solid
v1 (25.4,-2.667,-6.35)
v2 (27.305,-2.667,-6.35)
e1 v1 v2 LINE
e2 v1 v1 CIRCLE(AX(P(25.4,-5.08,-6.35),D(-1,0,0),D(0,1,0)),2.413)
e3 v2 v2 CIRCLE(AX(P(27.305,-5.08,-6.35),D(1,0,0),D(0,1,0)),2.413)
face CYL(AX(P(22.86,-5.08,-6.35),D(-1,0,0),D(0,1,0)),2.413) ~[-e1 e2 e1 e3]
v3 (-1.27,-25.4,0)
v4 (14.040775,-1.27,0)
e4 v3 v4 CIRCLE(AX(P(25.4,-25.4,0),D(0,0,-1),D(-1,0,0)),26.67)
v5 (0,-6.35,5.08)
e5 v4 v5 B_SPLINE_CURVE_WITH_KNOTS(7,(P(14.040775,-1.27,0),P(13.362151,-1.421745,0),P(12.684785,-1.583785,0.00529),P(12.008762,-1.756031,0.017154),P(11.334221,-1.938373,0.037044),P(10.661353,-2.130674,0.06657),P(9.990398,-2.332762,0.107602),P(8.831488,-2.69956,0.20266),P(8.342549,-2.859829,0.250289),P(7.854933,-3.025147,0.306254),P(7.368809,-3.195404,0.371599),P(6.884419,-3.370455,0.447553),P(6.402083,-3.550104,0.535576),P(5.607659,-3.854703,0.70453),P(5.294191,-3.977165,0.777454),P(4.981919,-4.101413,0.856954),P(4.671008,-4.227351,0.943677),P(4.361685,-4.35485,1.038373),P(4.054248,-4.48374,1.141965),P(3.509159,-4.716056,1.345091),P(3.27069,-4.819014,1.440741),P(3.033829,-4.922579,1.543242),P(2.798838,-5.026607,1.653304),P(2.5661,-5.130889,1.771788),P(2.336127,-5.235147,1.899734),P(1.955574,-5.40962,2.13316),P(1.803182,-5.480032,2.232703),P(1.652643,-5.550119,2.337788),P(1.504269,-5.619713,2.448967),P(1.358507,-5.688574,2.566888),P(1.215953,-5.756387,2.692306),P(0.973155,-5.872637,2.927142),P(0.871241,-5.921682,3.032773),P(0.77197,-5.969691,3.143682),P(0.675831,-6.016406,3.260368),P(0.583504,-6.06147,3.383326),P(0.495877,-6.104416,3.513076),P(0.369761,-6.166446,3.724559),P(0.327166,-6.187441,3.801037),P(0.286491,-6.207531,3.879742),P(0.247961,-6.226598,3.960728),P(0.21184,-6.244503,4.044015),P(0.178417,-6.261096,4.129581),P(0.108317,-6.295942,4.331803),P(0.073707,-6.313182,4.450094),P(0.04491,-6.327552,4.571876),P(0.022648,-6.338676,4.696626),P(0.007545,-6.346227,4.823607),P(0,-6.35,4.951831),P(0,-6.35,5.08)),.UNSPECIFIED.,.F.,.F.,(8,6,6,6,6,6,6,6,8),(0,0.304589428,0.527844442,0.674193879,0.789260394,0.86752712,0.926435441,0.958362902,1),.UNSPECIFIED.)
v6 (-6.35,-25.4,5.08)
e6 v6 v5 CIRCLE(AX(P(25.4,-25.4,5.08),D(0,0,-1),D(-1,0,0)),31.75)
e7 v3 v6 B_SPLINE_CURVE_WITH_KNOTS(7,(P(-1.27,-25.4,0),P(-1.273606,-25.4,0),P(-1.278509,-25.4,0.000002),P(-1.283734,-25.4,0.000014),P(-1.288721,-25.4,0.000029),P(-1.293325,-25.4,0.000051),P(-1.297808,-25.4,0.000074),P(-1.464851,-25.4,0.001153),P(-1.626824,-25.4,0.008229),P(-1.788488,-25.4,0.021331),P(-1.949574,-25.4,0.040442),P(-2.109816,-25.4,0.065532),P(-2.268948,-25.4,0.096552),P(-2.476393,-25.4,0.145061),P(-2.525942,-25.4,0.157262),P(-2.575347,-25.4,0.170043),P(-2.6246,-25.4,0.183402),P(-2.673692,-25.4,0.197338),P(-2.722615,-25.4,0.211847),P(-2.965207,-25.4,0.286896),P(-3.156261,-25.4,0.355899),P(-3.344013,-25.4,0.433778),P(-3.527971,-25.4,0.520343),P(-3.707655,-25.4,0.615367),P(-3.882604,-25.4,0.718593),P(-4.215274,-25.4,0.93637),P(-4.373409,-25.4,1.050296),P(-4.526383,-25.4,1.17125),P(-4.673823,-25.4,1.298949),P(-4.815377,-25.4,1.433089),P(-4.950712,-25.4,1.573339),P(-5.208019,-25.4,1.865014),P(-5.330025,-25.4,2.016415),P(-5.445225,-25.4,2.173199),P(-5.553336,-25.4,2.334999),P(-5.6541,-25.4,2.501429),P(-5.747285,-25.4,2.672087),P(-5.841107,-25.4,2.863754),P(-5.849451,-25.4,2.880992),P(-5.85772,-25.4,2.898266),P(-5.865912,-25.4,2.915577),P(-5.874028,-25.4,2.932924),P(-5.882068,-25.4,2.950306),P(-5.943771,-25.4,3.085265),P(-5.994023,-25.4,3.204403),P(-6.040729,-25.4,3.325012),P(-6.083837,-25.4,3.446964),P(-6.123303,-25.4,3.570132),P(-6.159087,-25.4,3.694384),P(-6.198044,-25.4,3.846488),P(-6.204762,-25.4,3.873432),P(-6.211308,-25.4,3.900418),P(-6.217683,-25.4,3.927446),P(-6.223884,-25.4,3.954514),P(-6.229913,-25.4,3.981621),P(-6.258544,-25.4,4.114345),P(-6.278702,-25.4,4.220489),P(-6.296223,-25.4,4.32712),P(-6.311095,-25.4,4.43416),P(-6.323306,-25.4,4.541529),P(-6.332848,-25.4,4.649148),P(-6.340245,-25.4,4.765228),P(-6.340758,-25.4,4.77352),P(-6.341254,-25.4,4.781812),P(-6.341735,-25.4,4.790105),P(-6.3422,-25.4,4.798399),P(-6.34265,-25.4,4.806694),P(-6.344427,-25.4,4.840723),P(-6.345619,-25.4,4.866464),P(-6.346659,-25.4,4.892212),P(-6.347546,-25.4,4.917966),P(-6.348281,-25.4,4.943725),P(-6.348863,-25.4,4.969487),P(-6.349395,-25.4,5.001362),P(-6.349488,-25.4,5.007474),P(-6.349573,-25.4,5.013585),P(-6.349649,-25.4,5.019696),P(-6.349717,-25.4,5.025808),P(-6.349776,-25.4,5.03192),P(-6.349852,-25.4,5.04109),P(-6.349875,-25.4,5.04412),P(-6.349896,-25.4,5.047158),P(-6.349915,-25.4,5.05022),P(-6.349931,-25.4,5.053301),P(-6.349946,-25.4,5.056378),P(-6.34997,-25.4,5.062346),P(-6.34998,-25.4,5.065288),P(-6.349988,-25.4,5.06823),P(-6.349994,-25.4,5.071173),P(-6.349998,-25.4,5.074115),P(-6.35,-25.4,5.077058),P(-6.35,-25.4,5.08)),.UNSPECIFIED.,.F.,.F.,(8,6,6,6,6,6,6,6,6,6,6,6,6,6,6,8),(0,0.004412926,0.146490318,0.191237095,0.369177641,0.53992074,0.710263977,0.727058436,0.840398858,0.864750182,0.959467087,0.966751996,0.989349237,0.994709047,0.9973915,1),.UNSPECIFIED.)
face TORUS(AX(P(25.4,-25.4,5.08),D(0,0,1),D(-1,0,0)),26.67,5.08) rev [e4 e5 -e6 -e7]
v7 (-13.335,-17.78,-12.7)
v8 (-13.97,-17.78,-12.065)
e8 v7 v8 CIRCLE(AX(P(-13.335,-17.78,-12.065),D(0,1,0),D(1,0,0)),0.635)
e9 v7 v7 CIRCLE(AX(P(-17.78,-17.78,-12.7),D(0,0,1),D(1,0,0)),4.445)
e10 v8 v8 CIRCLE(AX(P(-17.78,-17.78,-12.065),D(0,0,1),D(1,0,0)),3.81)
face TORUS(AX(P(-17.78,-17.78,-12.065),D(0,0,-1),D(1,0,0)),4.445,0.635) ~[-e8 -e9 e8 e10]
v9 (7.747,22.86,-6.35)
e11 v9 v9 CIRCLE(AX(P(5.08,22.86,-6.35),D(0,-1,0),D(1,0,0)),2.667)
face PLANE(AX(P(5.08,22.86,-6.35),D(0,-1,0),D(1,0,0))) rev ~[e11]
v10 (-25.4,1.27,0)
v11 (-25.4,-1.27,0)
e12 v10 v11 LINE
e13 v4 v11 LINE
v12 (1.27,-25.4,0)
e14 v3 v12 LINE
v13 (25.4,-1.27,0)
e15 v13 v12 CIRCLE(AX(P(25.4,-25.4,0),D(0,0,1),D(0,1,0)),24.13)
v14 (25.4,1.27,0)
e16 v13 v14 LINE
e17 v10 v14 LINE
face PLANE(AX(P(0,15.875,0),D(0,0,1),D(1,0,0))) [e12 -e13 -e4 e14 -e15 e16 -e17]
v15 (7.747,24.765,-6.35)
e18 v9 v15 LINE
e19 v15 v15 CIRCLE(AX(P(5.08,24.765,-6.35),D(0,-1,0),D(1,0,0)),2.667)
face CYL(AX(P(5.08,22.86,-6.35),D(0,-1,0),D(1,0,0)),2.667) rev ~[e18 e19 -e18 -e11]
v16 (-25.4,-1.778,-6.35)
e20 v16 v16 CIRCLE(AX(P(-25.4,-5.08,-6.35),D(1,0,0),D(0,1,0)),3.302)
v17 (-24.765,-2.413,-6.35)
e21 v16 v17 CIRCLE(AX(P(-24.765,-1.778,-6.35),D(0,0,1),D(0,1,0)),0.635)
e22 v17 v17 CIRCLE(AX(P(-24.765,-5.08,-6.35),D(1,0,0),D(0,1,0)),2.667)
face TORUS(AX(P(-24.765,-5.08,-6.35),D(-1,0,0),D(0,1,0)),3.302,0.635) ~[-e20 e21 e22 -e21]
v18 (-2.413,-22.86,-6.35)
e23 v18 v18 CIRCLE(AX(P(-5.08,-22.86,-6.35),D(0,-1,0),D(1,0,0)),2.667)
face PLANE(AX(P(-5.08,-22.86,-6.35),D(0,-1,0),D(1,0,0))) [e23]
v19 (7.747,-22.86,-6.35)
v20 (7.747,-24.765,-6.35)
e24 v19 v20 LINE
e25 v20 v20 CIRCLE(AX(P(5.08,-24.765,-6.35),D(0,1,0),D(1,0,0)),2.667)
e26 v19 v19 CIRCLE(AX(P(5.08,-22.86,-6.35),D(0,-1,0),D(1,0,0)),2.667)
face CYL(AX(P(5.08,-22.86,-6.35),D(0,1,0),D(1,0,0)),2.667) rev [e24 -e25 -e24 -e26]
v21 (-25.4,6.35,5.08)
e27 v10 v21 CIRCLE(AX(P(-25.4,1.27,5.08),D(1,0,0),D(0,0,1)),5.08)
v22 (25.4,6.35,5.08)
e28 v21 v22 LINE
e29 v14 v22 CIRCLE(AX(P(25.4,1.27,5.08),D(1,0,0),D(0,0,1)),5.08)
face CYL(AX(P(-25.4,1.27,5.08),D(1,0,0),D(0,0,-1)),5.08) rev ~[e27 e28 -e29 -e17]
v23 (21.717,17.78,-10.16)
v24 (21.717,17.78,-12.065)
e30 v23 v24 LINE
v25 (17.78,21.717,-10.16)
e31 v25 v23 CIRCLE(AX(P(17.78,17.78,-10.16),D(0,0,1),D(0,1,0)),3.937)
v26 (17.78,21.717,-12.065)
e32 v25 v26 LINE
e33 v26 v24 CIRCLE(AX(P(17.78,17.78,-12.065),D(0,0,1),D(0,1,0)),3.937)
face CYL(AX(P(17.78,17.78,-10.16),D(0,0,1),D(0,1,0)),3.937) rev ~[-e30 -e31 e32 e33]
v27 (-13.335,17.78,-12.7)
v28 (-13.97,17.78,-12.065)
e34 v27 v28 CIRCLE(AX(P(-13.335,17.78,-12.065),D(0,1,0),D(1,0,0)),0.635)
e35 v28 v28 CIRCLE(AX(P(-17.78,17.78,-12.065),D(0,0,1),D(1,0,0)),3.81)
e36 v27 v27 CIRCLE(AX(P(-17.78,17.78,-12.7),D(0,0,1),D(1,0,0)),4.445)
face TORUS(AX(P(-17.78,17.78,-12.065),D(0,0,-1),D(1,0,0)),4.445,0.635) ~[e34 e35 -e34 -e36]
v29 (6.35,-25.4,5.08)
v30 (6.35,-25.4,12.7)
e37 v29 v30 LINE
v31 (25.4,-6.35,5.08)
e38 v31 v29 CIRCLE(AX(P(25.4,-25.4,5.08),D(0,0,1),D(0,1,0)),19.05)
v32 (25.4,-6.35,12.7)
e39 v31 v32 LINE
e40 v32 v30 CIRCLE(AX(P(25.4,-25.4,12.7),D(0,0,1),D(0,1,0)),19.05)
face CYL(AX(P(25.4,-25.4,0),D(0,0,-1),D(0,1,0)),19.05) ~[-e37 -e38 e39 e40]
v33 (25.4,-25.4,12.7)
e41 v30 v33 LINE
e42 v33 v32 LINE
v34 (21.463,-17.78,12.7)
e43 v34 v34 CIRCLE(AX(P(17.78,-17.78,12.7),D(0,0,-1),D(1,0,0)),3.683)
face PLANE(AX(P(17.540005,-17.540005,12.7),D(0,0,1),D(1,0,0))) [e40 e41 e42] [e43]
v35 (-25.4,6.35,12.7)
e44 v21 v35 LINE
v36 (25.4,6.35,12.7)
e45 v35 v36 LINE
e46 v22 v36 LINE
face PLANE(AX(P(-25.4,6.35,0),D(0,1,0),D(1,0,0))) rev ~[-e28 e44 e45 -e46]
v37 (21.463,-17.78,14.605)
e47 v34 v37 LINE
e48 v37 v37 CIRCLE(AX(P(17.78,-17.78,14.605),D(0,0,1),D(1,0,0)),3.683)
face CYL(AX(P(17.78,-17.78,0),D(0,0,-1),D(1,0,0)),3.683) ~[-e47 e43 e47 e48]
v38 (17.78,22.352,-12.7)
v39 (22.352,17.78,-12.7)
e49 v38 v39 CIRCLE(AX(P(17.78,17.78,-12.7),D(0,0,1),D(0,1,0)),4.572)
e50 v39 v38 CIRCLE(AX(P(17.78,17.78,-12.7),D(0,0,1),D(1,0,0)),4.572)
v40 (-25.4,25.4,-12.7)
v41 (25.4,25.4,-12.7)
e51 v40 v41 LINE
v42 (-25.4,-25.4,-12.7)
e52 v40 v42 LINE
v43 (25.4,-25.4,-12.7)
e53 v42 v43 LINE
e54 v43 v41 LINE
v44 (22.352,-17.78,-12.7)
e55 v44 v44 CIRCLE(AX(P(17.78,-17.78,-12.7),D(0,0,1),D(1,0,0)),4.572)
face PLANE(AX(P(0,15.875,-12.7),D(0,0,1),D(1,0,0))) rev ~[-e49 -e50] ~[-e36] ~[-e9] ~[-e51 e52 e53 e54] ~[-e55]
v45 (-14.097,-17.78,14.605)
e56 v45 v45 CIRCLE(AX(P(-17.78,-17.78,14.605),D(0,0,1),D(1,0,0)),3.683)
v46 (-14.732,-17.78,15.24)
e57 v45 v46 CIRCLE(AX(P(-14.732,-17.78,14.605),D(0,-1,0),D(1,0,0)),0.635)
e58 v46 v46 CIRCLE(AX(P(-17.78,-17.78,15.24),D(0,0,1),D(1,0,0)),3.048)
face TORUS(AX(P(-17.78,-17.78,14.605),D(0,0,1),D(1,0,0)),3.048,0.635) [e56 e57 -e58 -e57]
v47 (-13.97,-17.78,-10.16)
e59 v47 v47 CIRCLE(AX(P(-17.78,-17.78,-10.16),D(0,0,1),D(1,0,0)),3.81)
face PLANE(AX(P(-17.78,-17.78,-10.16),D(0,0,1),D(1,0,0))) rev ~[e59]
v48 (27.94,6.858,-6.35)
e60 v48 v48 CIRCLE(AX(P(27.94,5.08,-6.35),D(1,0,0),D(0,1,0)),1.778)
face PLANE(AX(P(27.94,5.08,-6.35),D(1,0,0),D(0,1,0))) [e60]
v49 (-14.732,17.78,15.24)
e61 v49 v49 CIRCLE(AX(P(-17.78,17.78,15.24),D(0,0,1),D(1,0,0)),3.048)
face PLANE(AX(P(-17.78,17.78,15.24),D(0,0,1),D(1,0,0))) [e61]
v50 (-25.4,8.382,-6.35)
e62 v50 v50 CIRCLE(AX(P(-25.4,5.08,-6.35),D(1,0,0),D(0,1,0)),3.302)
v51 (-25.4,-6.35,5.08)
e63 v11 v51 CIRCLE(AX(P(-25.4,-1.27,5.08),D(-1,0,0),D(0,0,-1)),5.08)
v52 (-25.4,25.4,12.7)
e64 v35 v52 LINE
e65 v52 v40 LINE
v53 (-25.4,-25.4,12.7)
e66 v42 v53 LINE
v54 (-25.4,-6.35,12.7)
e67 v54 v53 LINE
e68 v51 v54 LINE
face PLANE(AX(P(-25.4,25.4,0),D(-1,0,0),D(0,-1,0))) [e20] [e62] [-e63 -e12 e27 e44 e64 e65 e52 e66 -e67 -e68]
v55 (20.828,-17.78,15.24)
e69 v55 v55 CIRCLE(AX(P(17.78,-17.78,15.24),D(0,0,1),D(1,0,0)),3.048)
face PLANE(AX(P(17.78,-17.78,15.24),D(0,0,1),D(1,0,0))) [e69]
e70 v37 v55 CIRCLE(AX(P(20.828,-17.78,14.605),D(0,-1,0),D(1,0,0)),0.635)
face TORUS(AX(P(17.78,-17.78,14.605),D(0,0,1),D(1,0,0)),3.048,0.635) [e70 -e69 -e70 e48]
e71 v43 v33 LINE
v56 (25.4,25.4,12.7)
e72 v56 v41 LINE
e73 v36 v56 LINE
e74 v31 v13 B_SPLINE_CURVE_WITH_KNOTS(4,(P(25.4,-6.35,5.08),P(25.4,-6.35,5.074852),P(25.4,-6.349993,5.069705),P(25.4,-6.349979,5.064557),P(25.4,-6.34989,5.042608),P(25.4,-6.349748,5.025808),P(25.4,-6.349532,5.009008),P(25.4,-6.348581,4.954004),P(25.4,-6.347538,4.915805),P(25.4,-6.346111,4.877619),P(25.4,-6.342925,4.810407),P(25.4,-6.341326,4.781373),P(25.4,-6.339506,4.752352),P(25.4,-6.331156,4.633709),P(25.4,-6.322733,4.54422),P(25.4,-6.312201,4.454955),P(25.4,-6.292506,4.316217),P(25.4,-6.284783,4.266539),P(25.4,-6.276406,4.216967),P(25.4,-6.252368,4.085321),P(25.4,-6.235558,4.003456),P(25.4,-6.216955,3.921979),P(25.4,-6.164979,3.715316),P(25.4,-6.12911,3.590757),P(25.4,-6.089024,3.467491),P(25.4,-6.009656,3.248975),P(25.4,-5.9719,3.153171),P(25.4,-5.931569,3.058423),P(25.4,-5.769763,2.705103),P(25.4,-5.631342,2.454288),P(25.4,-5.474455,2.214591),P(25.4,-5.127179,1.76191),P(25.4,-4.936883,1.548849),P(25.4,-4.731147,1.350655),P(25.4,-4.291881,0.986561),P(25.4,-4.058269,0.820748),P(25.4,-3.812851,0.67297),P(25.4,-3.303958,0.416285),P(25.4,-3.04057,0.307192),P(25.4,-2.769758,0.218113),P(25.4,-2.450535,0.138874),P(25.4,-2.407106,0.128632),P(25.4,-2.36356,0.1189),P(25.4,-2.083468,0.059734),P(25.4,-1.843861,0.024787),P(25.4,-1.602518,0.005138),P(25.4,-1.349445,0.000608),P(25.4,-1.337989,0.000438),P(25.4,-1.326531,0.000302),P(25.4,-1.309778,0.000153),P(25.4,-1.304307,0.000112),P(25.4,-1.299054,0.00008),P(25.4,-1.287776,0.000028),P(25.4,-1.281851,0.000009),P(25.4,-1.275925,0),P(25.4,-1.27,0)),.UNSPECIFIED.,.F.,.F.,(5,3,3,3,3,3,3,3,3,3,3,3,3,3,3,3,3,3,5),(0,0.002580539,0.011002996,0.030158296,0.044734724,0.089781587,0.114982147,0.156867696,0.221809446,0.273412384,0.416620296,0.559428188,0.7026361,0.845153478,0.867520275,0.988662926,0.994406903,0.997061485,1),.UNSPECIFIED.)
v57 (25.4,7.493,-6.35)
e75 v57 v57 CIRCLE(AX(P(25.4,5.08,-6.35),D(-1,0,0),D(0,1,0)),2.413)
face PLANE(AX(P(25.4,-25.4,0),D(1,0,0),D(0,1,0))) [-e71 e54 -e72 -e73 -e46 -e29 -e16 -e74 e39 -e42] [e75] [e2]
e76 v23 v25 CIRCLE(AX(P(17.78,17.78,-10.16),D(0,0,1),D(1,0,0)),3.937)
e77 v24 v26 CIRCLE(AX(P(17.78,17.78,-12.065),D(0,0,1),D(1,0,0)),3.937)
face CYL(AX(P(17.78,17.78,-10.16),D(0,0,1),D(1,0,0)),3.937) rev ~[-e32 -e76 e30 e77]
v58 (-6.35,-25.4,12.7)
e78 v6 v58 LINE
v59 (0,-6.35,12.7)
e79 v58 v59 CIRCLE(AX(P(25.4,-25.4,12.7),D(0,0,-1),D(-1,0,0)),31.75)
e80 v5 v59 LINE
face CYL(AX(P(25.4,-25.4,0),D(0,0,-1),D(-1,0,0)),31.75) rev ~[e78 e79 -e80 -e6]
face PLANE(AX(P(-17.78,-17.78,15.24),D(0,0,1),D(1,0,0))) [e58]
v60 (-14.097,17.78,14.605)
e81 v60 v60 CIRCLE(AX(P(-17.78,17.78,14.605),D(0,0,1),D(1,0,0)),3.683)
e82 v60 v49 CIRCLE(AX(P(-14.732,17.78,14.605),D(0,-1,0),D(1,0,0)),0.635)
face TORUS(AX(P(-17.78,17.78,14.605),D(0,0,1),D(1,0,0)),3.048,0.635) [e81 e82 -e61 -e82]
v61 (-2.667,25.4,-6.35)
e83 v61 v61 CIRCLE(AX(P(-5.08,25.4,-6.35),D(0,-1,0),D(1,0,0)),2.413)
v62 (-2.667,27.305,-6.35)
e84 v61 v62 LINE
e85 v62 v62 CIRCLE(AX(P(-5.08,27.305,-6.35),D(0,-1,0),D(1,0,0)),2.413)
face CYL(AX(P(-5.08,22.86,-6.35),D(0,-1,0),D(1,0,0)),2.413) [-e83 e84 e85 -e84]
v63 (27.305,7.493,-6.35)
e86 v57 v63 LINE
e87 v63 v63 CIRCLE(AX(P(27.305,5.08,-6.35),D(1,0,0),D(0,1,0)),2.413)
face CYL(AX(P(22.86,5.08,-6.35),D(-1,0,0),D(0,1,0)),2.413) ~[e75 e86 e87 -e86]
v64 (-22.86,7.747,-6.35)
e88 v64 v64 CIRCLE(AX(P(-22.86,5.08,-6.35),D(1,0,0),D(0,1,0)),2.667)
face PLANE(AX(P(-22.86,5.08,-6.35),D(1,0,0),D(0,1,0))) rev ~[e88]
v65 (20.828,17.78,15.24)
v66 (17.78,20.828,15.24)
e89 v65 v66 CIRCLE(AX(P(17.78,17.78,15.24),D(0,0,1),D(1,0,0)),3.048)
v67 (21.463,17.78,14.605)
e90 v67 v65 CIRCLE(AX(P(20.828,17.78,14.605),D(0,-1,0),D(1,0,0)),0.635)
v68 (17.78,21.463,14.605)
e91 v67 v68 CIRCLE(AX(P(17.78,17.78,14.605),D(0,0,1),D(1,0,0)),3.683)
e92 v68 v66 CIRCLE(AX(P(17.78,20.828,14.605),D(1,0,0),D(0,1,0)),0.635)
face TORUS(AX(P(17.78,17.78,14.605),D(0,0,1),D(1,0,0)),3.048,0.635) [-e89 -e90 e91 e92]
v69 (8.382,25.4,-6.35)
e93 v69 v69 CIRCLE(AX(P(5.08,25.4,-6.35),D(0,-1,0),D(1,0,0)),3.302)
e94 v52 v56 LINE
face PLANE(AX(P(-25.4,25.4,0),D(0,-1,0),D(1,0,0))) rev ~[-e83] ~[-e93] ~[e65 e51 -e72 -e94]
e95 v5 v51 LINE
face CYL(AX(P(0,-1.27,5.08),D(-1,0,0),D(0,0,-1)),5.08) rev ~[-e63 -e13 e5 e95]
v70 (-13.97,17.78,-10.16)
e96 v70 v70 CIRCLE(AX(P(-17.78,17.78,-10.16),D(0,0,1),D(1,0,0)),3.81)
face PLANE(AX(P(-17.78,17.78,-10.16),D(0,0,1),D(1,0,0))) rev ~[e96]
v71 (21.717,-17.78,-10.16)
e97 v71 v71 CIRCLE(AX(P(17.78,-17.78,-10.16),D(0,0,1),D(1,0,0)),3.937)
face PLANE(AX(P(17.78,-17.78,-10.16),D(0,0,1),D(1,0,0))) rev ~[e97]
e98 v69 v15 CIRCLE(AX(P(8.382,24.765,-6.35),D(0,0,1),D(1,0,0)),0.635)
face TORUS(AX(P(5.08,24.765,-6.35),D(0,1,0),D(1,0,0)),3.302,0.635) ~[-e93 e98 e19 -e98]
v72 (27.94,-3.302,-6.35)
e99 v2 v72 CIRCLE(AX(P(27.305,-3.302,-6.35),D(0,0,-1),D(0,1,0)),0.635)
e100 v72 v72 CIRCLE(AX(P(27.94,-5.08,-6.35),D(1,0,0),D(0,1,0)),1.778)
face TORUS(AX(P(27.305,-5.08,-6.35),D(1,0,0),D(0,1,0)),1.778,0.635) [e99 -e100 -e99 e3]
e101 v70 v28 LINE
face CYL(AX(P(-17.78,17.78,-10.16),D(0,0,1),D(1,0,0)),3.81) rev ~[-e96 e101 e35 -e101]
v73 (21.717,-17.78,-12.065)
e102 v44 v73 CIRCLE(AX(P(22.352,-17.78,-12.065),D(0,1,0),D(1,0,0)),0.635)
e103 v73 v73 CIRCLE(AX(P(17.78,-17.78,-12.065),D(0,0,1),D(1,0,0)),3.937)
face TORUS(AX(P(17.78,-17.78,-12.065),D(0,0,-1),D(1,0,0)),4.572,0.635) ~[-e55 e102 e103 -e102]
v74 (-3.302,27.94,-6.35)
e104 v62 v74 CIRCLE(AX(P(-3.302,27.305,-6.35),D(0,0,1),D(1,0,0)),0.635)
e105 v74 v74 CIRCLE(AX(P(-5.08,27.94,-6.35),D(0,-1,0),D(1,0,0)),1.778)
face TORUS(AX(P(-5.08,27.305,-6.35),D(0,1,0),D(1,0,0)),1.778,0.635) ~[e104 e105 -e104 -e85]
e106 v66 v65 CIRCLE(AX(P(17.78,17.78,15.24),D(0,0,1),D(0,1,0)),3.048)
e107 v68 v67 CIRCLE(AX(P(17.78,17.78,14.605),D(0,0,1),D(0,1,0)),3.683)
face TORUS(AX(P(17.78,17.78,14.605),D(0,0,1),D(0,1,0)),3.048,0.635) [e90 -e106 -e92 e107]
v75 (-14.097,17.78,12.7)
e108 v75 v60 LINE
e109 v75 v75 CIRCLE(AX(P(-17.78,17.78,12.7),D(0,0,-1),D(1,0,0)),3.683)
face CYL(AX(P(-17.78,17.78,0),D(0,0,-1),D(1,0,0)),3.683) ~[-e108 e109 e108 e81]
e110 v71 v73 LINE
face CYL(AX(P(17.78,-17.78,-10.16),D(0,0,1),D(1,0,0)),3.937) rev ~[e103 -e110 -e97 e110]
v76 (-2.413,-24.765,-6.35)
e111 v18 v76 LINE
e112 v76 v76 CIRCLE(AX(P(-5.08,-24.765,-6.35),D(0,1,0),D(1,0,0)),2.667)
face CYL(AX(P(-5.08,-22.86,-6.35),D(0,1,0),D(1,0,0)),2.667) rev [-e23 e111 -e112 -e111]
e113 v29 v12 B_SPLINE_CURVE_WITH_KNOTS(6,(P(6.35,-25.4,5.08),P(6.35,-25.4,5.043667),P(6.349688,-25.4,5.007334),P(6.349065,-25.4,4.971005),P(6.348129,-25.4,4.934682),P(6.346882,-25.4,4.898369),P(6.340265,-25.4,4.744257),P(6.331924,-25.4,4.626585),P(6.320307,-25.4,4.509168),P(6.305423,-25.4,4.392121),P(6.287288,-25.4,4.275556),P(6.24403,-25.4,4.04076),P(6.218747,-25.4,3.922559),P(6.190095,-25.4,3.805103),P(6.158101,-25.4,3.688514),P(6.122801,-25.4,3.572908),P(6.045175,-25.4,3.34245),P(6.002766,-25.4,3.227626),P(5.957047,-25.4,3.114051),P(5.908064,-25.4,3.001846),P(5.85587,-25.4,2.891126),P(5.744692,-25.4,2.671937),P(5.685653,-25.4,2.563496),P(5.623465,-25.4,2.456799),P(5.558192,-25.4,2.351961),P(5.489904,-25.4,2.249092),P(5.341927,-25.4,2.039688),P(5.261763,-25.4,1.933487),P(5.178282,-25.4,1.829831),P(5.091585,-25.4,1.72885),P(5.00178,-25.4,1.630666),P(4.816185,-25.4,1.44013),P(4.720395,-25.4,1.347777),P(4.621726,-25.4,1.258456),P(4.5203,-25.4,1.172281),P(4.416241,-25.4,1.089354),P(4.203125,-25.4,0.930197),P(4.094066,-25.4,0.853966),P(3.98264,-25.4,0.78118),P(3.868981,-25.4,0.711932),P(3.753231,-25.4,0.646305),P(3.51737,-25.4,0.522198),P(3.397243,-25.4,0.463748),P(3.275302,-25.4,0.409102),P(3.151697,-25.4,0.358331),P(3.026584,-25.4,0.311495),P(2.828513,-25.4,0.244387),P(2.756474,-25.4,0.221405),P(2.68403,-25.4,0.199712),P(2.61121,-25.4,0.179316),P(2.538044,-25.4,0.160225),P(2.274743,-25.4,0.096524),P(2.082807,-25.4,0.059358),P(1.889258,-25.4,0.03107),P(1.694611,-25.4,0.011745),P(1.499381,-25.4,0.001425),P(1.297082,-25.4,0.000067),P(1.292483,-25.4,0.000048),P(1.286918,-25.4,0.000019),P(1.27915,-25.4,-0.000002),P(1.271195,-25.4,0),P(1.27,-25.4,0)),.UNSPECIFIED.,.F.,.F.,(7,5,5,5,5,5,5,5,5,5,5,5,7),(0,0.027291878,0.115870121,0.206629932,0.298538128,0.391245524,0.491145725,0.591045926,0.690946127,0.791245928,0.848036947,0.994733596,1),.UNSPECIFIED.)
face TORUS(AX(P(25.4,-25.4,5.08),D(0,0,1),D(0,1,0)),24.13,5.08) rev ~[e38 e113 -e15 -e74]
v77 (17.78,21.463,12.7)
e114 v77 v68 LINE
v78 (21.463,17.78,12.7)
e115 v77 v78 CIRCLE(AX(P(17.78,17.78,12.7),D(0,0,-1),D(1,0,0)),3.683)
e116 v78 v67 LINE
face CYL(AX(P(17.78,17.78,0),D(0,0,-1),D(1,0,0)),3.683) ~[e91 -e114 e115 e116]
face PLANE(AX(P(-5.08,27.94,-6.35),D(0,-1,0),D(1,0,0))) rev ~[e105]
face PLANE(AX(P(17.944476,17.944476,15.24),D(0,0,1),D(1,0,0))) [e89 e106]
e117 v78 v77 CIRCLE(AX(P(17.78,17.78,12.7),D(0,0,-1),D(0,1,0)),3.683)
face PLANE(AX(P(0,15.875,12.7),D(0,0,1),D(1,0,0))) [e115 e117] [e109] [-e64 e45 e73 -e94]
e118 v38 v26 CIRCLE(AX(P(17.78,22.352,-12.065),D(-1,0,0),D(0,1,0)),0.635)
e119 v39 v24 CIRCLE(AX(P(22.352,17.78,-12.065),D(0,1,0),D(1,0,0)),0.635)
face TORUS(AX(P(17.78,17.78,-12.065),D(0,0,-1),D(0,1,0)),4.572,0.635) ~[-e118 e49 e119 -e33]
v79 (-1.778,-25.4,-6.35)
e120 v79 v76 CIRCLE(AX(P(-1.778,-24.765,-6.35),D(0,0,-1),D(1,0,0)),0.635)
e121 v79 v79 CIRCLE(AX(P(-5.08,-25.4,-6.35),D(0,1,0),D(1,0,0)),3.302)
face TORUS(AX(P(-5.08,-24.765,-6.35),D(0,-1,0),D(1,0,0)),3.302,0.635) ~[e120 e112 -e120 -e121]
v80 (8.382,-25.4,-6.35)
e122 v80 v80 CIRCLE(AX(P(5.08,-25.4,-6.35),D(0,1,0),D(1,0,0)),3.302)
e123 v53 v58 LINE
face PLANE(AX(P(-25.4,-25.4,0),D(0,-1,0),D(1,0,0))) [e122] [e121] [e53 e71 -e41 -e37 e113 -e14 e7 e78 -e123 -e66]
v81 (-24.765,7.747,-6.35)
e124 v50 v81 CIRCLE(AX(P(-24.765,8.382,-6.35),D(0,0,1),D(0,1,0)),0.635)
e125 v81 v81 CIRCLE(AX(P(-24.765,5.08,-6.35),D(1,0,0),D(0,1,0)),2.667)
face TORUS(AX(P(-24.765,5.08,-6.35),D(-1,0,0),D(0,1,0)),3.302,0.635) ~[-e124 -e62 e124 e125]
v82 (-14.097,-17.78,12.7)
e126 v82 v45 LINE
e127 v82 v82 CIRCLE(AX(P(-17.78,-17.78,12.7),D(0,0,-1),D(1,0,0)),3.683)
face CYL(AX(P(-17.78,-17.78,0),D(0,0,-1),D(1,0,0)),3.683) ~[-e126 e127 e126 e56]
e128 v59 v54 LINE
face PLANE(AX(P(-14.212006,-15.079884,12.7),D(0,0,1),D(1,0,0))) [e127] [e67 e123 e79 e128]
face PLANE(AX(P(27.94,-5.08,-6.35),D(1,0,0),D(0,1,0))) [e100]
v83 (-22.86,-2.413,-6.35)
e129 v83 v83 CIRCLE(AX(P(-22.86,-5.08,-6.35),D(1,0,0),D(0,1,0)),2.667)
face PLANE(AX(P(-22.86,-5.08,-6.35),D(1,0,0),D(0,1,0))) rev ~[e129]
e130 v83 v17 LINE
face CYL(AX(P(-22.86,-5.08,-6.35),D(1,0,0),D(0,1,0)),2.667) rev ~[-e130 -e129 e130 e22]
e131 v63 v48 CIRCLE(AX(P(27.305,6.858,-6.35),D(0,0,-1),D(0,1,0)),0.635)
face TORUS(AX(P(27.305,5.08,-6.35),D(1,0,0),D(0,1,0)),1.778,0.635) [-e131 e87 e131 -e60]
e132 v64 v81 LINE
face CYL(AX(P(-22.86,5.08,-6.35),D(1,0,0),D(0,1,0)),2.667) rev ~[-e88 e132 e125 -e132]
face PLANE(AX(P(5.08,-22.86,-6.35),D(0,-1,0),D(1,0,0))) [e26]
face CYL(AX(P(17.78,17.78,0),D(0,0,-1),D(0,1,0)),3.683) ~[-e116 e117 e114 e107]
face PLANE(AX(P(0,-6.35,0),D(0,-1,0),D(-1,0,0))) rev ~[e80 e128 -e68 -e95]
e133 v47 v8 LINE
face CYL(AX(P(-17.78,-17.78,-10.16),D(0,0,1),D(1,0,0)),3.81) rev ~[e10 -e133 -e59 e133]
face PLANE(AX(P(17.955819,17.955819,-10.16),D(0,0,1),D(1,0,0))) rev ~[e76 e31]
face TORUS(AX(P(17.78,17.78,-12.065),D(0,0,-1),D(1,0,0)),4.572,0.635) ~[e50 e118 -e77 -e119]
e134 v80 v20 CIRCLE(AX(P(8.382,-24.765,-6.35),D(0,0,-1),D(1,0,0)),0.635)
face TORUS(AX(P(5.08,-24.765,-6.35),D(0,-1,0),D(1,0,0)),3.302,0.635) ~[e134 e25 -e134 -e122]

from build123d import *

# Parameters (mm, degrees)
F0_W      = 50.8
F0_H      = 19.05
F0_R      = 3.81
F0_R_2    = 3.683
F1_DEPTH  = 12.7
F0_R_3    = 3.937
F2_DEPTH  = 15.24
F0_R_4    = 5.08
F0_R_5    = 2.667
F0_R_6    = 2.413
F1_FACE_W = 50.8
F1_FACE_H = 19.05
F1_FACE_R = 3.683
F3_DEPTH  = 12.7
F4_START  = -10.16
F4_DEPTH  = 2.54
F7_START  = -22.86
F6_R      = 2.413
F7_DEPTH  = 5.08
F8_START  = 22.86
F6_R_2    = 2.667
F8_DEPTH  = 5.08
F9_START  = 22.86
F5_R      = 2.413
F9_DEPTH  = 5.08
F10_START = -22.86
F5_R_2    = 2.667
F10_DEPTH = 5.08
F11_START = -22.86
F11_DEPTH = 5.08
F12_R     = 5.08
F13_R     = 0.635


with BuildPart() as f1:
    # F0 (on Top) → F1 (new body)
    with BuildSketch(Plane.XY):
        with Locations((0, 15.875)):
            Rectangle(F0_W, F0_H)
        with Locations((-17.78, 17.78)):
            Circle(F0_R, mode=Mode.SUBTRACT)
        with BuildLine():
            ThreePointArc((21.717, 17.78), (14.9961206025, 14.9961206025), (17.78, 21.717))
            ThreePointArc((17.78, 21.717), (20.5638793975, 20.5638793975), (21.717, 17.78))
        make_face(mode=Mode.SUBTRACT)
        with BuildLine():
            ThreePointArc((21.717, 17.78), (20.5638793975, 20.5638793975), (17.78, 21.717))
            ThreePointArc((17.78, 21.717), (14.9961206025, 14.9961206025), (21.717, 17.78))
        make_face()
        with BuildLine():
            ThreePointArc((17.78, 21.463), (20.3842742751, 20.3842742751), (21.463, 17.78))
            ThreePointArc((21.463, 17.78), (15.1757257249, 15.1757257249), (17.78, 21.463))
        make_face(mode=Mode.SUBTRACT)
        with Locations((-17.78, 17.78)):
            Circle(F0_R)
        with Locations((-17.78, 17.78)):
            Circle(F0_R_2, mode=Mode.SUBTRACT)
        with BuildLine():
            ThreePointArc((17.78, 21.463), (15.1757257249, 15.1757257249), (21.463, 17.78))
            ThreePointArc((21.463, 17.78), (20.3842742751, 20.3842742751), (17.78, 21.463))
        make_face()
        with Locations((-17.78, 17.78)):
            Circle(F0_R_2)
    extrude(amount=F1_DEPTH)

    # F0 (on Top) → F2, piece 2 (join)
    with BuildSketch(Plane.XY):
        with Locations((-17.78, 17.78)):
            Circle(F0_R_2)
        with BuildLine():
            ThreePointArc((17.78, 21.463), (15.1757257249, 15.1757257249), (21.463, 17.78))
            ThreePointArc((21.463, 17.78), (20.3842742751, 20.3842742751), (17.78, 21.463))
        make_face()
    extrude(amount=F2_DEPTH)



with BuildPart() as f1b:
    # F0 (on Top) → F1, piece 2 (new body)
    with BuildSketch(Plane.XY):
        with BuildLine():
            Line((25.4, -25.4), (25.4, -6.35))
            ThreePointArc((25.4, -6.35), (11.9296158184, -11.9296158184), (6.35, -25.4))
            Line((6.35, -25.4), (25.4, -25.4))
        make_face()
        with Locations((17.78, -17.78)):
            Circle(F0_R_3, mode=Mode.SUBTRACT)
        with Locations((17.78, -17.78)):
            Circle(F0_R_3)
        with Locations((17.78, -17.78)):
            Circle(F0_R_2, mode=Mode.SUBTRACT)
        with Locations((17.78, -17.78)):
            Circle(F0_R_2)
    extrude(amount=F1_DEPTH)

    # F0 (on Top) → F2, piece 3 (join)
    with BuildSketch(Plane.XY):
        with Locations((17.78, -17.78)):
            Circle(F0_R_2)
    extrude(amount=F2_DEPTH)


with BuildPart() as f1c:
    # F0 (on Top) → F1, piece 3 (new body)
    with BuildSketch(Plane.XY):
        with BuildLine():
            Line((0, -6.35), (-25.4, -6.35))
            Line((-25.4, -6.35), (-25.4, -25.4))
            Line((-25.4, -25.4), (-6.35, -25.4))
            ThreePointArc((-6.35, -25.4), (-4.7206947131, -15.359768429), (0, -6.35))
        make_face()
        with Locations((-17.78, -17.78)):
            Circle(F0_R, mode=Mode.SUBTRACT)
        with Locations((-17.78, -17.78)):
            Circle(F0_R)
        with Locations((-17.78, -17.78)):
            Circle(F0_R_2, mode=Mode.SUBTRACT)
        with Locations((-17.78, -17.78)):
            Circle(F0_R_2)
    extrude(amount=F1_DEPTH)

    # F0 (on Top) → F2 (join)
    with BuildSketch(Plane.XY):
        with Locations((-17.78, -17.78)):
            Circle(F0_R_2)
    extrude(amount=F2_DEPTH)


with BuildPart() as f1_1:
    add(f1.part)

    add(f1b.part)  # F3 merges F1b

    add(f1c.part)  # F3 merges F1c
    # F0 (on Top) + F1_face (on face) → F3 (join)
    with BuildSketch(Plane.XY):
        with Locations((0, 15.875)):
            Rectangle(F0_W, F0_H)
        with Locations((-17.78, 17.78)):
            Circle(F0_R, mode=Mode.SUBTRACT)
        with BuildLine():
            ThreePointArc((21.717, 17.78), (14.9961206025, 14.9961206025), (17.78, 21.717))
            ThreePointArc((17.78, 21.717), (20.5638793975, 20.5638793975), (21.717, 17.78))
        make_face(mode=Mode.SUBTRACT)
        with BuildLine():
            Line((25.4, -6.35), (25.4, 6.35))
            Line((25.4, 6.35), (-25.4, 6.35))
            Line((-25.4, 6.35), (-25.4, -6.35))
            Line((-25.4, -6.35), (0, -6.35))
            ThreePointArc((0, -6.35), (-4.7206947131, -15.359768429), (-6.35, -25.4))
            Line((-6.35, -25.4), (6.35, -25.4))
            ThreePointArc((6.35, -25.4), (11.9296158184, -11.9296158184), (25.4, -6.35))
        make_face()
        Circle(F0_R_4, mode=Mode.SUBTRACT)
        with BuildLine():
            Line((0, -6.35), (-25.4, -6.35))
            Line((-25.4, -6.35), (-25.4, -25.4))
            Line((-25.4, -25.4), (-6.35, -25.4))
            ThreePointArc((-6.35, -25.4), (-4.7206947131, -15.359768429), (0, -6.35))
        make_face()
        with Locations((-17.78, -17.78)):
            Circle(F0_R, mode=Mode.SUBTRACT)
        with BuildLine():
            Line((25.4, -25.4), (25.4, -6.35))
            ThreePointArc((25.4, -6.35), (11.9296158184, -11.9296158184), (6.35, -25.4))
            Line((6.35, -25.4), (25.4, -25.4))
        make_face()
        with Locations((17.78, -17.78)):
            Circle(F0_R_3, mode=Mode.SUBTRACT)
        Circle(F0_R_4)
        Circle(F0_R_5, mode=Mode.SUBTRACT)
        with BuildLine():
            ThreePointArc((21.717, 17.78), (20.5638793975, 20.5638793975), (17.78, 21.717))
            ThreePointArc((17.78, 21.717), (14.9961206025, 14.9961206025), (21.717, 17.78))
        make_face()
        with BuildLine():
            ThreePointArc((17.78, 21.463), (20.3842742751, 20.3842742751), (21.463, 17.78))
            ThreePointArc((21.463, 17.78), (15.1757257249, 15.1757257249), (17.78, 21.463))
        make_face(mode=Mode.SUBTRACT)
        with Locations((17.78, -17.78)):
            Circle(F0_R_3)
        with Locations((17.78, -17.78)):
            Circle(F0_R_2, mode=Mode.SUBTRACT)
        with Locations((-17.78, -17.78)):
            Circle(F0_R)
        with Locations((-17.78, -17.78)):
            Circle(F0_R_2, mode=Mode.SUBTRACT)
        with Locations((-17.78, 17.78)):
            Circle(F0_R)
        with Locations((-17.78, 17.78)):
            Circle(F0_R_2, mode=Mode.SUBTRACT)
        with Locations((-17.78, -17.78)):
            Circle(F0_R_2)
        with Locations((-17.78, 17.78)):
            Circle(F0_R_2)
        with BuildLine():
            ThreePointArc((17.78, 21.463), (15.1757257249, 15.1757257249), (21.463, 17.78))
            ThreePointArc((21.463, 17.78), (20.3842742751, 20.3842742751), (17.78, 21.463))
        make_face()
        with Locations((17.78, -17.78)):
            Circle(F0_R_2)
        Circle(F0_R_5)
        Circle(F0_R_6, mode=Mode.SUBTRACT)
        Circle(F0_R_6)
    with BuildSketch(Plane(origin=(0, 15.6910254438, 12.7), x_dir=(1, 0, 0), z_dir=(0, 0, 1))):
        with Locations((0, 0.1839745562)):
            Rectangle(F1_FACE_W, F1_FACE_H)
        with Locations((-17.78, 2.0889745562)):
            Circle(F1_FACE_R, mode=Mode.SUBTRACT)
        with Locations((17.78, 2.0889745562)):
            Circle(F1_FACE_R, mode=Mode.SUBTRACT)
    extrude(amount=-F3_DEPTH)

    # F0 (on Top) → F4 (cut)
    with BuildSketch(Plane.XY.offset(F4_START)):
        with Locations((17.78, -17.78)):
            Circle(F0_R_3)
        with Locations((17.78, -17.78)):
            Circle(F0_R_2, mode=Mode.SUBTRACT)
        with BuildLine():
            ThreePointArc((21.717, 17.78), (20.5638793975, 20.5638793975), (17.78, 21.717))
            ThreePointArc((17.78, 21.717), (14.9961206025, 14.9961206025), (21.717, 17.78))
        make_face()
        with BuildLine():
            ThreePointArc((17.78, 21.463), (20.3842742751, 20.3842742751), (21.463, 17.78))
            ThreePointArc((21.463, 17.78), (15.1757257249, 15.1757257249), (17.78, 21.463))
        make_face(mode=Mode.SUBTRACT)
        with Locations((-17.78, -17.78)):
            Circle(F0_R)
        with Locations((-17.78, -17.78)):
            Circle(F0_R_2, mode=Mode.SUBTRACT)
        with Locations((-17.78, 17.78)):
            Circle(F0_R)
        with Locations((-17.78, 17.78)):
            Circle(F0_R_2, mode=Mode.SUBTRACT)
        with Locations((-17.78, -17.78)):
            Circle(F0_R_2)
        with Locations((-17.78, 17.78)):
            Circle(F0_R_2)
        with BuildLine():
            ThreePointArc((17.78, 21.463), (15.1757257249, 15.1757257249), (21.463, 17.78))
            ThreePointArc((21.463, 17.78), (20.3842742751, 20.3842742751), (17.78, 21.463))
        make_face()
        with Locations((17.78, -17.78)):
            Circle(F0_R_2)
    extrude(amount=-F4_DEPTH, mode=Mode.SUBTRACT)

    # F6 (on Front) → F7 (join)
    with BuildSketch(Plane.XZ.offset(F7_START)):
        with Locations((-5.08, -6.35)):
            Circle(F6_R)
    extrude(amount=-F7_DEPTH)

    # F6 (on Front) → F8 (cut)
    with BuildSketch(Plane.XZ.offset(F8_START)):
        with Locations((-5.08, -6.35)):
            Circle(F6_R_2)
        with Locations((-5.08, -6.35)):
            Circle(F6_R, mode=Mode.SUBTRACT)
        with Locations((5.08, -6.35)):
            Circle(F6_R_2)
        with Locations((5.08, -6.35)):
            Circle(F6_R, mode=Mode.SUBTRACT)
        with Locations((-5.08, -6.35)):
            Circle(F6_R)
        with Locations((5.08, -6.35)):
            Circle(F6_R)
    extrude(amount=F8_DEPTH, mode=Mode.SUBTRACT)

    # F5 (on Right) → F9 (join)
    with BuildSketch(Plane.YZ.offset(F9_START)):
        with Locations((-5.08, -6.35)):
            Circle(F5_R)
        with Locations((5.08, -6.35)):
            Circle(F5_R)
    extrude(amount=F9_DEPTH)

    # F5 (on Right) → F10 (cut)
    with BuildSketch(Plane.YZ.offset(F10_START)):
        with Locations((-5.08, -6.35)):
            Circle(F5_R_2)
        with Locations((-5.08, -6.35)):
            Circle(F5_R, mode=Mode.SUBTRACT)
        with Locations((5.08, -6.35)):
            Circle(F5_R_2)
        with Locations((5.08, -6.35)):
            Circle(F5_R, mode=Mode.SUBTRACT)
        with Locations((-5.08, -6.35)):
            Circle(F5_R)
        with Locations((5.08, -6.35)):
            Circle(F5_R)
    extrude(amount=-F10_DEPTH, mode=Mode.SUBTRACT)

    # F6 (on Front) → F11 (cut)
    with BuildSketch(Plane.XZ.offset(F11_START)):
        with Locations((5.08, -6.35)):
            Circle(F6_R_2)
        with Locations((5.08, -6.35)):
            Circle(F6_R, mode=Mode.SUBTRACT)
        with Locations((5.08, -6.35)):
            Circle(F6_R)
    extrude(amount=-F11_DEPTH, mode=Mode.SUBTRACT)

    # F12
    f12_edges = [f1_1.edges().sort_by_distance(p)[0] for p in [
        (11.929616, -11.929616, 0),
        (0, 6.35, 0),
        (-4.720695, -15.359768, 0),
        (-12.7, -6.35, 0),
    ]]
    fillet(f12_edges, radius=F12_R)

    # F13
    f13_edges = [f1_1.edges().sort_by_distance(p)[0] for p in [
        (-21.463, -17.78, 15.24),
        (-21.463, 17.78, 15.24),
        (-7.493, 27.94, -6.35),
        (-25.4, -7.747, -6.35),
        (27.94, 2.667, -6.35),
        (27.94, -7.493, -6.35),
        (-25.4, 2.413, -6.35),
        (14.097, 17.78, 15.24),
        (14.097, -17.78, 15.24),
        (13.843, -17.78, -12.7),
        (17.78, 13.843, -12.7),
        (-21.59, 17.78, -12.7),
        (-21.59, -17.78, -12.7),
        (-7.747, -25.4, -6.35),
        (2.413, -25.4, -6.35),
        (2.413, 25.4, -6.35),
    ]]
    fillet(f13_edges, radius=F13_R)


solid = f1_1.part
